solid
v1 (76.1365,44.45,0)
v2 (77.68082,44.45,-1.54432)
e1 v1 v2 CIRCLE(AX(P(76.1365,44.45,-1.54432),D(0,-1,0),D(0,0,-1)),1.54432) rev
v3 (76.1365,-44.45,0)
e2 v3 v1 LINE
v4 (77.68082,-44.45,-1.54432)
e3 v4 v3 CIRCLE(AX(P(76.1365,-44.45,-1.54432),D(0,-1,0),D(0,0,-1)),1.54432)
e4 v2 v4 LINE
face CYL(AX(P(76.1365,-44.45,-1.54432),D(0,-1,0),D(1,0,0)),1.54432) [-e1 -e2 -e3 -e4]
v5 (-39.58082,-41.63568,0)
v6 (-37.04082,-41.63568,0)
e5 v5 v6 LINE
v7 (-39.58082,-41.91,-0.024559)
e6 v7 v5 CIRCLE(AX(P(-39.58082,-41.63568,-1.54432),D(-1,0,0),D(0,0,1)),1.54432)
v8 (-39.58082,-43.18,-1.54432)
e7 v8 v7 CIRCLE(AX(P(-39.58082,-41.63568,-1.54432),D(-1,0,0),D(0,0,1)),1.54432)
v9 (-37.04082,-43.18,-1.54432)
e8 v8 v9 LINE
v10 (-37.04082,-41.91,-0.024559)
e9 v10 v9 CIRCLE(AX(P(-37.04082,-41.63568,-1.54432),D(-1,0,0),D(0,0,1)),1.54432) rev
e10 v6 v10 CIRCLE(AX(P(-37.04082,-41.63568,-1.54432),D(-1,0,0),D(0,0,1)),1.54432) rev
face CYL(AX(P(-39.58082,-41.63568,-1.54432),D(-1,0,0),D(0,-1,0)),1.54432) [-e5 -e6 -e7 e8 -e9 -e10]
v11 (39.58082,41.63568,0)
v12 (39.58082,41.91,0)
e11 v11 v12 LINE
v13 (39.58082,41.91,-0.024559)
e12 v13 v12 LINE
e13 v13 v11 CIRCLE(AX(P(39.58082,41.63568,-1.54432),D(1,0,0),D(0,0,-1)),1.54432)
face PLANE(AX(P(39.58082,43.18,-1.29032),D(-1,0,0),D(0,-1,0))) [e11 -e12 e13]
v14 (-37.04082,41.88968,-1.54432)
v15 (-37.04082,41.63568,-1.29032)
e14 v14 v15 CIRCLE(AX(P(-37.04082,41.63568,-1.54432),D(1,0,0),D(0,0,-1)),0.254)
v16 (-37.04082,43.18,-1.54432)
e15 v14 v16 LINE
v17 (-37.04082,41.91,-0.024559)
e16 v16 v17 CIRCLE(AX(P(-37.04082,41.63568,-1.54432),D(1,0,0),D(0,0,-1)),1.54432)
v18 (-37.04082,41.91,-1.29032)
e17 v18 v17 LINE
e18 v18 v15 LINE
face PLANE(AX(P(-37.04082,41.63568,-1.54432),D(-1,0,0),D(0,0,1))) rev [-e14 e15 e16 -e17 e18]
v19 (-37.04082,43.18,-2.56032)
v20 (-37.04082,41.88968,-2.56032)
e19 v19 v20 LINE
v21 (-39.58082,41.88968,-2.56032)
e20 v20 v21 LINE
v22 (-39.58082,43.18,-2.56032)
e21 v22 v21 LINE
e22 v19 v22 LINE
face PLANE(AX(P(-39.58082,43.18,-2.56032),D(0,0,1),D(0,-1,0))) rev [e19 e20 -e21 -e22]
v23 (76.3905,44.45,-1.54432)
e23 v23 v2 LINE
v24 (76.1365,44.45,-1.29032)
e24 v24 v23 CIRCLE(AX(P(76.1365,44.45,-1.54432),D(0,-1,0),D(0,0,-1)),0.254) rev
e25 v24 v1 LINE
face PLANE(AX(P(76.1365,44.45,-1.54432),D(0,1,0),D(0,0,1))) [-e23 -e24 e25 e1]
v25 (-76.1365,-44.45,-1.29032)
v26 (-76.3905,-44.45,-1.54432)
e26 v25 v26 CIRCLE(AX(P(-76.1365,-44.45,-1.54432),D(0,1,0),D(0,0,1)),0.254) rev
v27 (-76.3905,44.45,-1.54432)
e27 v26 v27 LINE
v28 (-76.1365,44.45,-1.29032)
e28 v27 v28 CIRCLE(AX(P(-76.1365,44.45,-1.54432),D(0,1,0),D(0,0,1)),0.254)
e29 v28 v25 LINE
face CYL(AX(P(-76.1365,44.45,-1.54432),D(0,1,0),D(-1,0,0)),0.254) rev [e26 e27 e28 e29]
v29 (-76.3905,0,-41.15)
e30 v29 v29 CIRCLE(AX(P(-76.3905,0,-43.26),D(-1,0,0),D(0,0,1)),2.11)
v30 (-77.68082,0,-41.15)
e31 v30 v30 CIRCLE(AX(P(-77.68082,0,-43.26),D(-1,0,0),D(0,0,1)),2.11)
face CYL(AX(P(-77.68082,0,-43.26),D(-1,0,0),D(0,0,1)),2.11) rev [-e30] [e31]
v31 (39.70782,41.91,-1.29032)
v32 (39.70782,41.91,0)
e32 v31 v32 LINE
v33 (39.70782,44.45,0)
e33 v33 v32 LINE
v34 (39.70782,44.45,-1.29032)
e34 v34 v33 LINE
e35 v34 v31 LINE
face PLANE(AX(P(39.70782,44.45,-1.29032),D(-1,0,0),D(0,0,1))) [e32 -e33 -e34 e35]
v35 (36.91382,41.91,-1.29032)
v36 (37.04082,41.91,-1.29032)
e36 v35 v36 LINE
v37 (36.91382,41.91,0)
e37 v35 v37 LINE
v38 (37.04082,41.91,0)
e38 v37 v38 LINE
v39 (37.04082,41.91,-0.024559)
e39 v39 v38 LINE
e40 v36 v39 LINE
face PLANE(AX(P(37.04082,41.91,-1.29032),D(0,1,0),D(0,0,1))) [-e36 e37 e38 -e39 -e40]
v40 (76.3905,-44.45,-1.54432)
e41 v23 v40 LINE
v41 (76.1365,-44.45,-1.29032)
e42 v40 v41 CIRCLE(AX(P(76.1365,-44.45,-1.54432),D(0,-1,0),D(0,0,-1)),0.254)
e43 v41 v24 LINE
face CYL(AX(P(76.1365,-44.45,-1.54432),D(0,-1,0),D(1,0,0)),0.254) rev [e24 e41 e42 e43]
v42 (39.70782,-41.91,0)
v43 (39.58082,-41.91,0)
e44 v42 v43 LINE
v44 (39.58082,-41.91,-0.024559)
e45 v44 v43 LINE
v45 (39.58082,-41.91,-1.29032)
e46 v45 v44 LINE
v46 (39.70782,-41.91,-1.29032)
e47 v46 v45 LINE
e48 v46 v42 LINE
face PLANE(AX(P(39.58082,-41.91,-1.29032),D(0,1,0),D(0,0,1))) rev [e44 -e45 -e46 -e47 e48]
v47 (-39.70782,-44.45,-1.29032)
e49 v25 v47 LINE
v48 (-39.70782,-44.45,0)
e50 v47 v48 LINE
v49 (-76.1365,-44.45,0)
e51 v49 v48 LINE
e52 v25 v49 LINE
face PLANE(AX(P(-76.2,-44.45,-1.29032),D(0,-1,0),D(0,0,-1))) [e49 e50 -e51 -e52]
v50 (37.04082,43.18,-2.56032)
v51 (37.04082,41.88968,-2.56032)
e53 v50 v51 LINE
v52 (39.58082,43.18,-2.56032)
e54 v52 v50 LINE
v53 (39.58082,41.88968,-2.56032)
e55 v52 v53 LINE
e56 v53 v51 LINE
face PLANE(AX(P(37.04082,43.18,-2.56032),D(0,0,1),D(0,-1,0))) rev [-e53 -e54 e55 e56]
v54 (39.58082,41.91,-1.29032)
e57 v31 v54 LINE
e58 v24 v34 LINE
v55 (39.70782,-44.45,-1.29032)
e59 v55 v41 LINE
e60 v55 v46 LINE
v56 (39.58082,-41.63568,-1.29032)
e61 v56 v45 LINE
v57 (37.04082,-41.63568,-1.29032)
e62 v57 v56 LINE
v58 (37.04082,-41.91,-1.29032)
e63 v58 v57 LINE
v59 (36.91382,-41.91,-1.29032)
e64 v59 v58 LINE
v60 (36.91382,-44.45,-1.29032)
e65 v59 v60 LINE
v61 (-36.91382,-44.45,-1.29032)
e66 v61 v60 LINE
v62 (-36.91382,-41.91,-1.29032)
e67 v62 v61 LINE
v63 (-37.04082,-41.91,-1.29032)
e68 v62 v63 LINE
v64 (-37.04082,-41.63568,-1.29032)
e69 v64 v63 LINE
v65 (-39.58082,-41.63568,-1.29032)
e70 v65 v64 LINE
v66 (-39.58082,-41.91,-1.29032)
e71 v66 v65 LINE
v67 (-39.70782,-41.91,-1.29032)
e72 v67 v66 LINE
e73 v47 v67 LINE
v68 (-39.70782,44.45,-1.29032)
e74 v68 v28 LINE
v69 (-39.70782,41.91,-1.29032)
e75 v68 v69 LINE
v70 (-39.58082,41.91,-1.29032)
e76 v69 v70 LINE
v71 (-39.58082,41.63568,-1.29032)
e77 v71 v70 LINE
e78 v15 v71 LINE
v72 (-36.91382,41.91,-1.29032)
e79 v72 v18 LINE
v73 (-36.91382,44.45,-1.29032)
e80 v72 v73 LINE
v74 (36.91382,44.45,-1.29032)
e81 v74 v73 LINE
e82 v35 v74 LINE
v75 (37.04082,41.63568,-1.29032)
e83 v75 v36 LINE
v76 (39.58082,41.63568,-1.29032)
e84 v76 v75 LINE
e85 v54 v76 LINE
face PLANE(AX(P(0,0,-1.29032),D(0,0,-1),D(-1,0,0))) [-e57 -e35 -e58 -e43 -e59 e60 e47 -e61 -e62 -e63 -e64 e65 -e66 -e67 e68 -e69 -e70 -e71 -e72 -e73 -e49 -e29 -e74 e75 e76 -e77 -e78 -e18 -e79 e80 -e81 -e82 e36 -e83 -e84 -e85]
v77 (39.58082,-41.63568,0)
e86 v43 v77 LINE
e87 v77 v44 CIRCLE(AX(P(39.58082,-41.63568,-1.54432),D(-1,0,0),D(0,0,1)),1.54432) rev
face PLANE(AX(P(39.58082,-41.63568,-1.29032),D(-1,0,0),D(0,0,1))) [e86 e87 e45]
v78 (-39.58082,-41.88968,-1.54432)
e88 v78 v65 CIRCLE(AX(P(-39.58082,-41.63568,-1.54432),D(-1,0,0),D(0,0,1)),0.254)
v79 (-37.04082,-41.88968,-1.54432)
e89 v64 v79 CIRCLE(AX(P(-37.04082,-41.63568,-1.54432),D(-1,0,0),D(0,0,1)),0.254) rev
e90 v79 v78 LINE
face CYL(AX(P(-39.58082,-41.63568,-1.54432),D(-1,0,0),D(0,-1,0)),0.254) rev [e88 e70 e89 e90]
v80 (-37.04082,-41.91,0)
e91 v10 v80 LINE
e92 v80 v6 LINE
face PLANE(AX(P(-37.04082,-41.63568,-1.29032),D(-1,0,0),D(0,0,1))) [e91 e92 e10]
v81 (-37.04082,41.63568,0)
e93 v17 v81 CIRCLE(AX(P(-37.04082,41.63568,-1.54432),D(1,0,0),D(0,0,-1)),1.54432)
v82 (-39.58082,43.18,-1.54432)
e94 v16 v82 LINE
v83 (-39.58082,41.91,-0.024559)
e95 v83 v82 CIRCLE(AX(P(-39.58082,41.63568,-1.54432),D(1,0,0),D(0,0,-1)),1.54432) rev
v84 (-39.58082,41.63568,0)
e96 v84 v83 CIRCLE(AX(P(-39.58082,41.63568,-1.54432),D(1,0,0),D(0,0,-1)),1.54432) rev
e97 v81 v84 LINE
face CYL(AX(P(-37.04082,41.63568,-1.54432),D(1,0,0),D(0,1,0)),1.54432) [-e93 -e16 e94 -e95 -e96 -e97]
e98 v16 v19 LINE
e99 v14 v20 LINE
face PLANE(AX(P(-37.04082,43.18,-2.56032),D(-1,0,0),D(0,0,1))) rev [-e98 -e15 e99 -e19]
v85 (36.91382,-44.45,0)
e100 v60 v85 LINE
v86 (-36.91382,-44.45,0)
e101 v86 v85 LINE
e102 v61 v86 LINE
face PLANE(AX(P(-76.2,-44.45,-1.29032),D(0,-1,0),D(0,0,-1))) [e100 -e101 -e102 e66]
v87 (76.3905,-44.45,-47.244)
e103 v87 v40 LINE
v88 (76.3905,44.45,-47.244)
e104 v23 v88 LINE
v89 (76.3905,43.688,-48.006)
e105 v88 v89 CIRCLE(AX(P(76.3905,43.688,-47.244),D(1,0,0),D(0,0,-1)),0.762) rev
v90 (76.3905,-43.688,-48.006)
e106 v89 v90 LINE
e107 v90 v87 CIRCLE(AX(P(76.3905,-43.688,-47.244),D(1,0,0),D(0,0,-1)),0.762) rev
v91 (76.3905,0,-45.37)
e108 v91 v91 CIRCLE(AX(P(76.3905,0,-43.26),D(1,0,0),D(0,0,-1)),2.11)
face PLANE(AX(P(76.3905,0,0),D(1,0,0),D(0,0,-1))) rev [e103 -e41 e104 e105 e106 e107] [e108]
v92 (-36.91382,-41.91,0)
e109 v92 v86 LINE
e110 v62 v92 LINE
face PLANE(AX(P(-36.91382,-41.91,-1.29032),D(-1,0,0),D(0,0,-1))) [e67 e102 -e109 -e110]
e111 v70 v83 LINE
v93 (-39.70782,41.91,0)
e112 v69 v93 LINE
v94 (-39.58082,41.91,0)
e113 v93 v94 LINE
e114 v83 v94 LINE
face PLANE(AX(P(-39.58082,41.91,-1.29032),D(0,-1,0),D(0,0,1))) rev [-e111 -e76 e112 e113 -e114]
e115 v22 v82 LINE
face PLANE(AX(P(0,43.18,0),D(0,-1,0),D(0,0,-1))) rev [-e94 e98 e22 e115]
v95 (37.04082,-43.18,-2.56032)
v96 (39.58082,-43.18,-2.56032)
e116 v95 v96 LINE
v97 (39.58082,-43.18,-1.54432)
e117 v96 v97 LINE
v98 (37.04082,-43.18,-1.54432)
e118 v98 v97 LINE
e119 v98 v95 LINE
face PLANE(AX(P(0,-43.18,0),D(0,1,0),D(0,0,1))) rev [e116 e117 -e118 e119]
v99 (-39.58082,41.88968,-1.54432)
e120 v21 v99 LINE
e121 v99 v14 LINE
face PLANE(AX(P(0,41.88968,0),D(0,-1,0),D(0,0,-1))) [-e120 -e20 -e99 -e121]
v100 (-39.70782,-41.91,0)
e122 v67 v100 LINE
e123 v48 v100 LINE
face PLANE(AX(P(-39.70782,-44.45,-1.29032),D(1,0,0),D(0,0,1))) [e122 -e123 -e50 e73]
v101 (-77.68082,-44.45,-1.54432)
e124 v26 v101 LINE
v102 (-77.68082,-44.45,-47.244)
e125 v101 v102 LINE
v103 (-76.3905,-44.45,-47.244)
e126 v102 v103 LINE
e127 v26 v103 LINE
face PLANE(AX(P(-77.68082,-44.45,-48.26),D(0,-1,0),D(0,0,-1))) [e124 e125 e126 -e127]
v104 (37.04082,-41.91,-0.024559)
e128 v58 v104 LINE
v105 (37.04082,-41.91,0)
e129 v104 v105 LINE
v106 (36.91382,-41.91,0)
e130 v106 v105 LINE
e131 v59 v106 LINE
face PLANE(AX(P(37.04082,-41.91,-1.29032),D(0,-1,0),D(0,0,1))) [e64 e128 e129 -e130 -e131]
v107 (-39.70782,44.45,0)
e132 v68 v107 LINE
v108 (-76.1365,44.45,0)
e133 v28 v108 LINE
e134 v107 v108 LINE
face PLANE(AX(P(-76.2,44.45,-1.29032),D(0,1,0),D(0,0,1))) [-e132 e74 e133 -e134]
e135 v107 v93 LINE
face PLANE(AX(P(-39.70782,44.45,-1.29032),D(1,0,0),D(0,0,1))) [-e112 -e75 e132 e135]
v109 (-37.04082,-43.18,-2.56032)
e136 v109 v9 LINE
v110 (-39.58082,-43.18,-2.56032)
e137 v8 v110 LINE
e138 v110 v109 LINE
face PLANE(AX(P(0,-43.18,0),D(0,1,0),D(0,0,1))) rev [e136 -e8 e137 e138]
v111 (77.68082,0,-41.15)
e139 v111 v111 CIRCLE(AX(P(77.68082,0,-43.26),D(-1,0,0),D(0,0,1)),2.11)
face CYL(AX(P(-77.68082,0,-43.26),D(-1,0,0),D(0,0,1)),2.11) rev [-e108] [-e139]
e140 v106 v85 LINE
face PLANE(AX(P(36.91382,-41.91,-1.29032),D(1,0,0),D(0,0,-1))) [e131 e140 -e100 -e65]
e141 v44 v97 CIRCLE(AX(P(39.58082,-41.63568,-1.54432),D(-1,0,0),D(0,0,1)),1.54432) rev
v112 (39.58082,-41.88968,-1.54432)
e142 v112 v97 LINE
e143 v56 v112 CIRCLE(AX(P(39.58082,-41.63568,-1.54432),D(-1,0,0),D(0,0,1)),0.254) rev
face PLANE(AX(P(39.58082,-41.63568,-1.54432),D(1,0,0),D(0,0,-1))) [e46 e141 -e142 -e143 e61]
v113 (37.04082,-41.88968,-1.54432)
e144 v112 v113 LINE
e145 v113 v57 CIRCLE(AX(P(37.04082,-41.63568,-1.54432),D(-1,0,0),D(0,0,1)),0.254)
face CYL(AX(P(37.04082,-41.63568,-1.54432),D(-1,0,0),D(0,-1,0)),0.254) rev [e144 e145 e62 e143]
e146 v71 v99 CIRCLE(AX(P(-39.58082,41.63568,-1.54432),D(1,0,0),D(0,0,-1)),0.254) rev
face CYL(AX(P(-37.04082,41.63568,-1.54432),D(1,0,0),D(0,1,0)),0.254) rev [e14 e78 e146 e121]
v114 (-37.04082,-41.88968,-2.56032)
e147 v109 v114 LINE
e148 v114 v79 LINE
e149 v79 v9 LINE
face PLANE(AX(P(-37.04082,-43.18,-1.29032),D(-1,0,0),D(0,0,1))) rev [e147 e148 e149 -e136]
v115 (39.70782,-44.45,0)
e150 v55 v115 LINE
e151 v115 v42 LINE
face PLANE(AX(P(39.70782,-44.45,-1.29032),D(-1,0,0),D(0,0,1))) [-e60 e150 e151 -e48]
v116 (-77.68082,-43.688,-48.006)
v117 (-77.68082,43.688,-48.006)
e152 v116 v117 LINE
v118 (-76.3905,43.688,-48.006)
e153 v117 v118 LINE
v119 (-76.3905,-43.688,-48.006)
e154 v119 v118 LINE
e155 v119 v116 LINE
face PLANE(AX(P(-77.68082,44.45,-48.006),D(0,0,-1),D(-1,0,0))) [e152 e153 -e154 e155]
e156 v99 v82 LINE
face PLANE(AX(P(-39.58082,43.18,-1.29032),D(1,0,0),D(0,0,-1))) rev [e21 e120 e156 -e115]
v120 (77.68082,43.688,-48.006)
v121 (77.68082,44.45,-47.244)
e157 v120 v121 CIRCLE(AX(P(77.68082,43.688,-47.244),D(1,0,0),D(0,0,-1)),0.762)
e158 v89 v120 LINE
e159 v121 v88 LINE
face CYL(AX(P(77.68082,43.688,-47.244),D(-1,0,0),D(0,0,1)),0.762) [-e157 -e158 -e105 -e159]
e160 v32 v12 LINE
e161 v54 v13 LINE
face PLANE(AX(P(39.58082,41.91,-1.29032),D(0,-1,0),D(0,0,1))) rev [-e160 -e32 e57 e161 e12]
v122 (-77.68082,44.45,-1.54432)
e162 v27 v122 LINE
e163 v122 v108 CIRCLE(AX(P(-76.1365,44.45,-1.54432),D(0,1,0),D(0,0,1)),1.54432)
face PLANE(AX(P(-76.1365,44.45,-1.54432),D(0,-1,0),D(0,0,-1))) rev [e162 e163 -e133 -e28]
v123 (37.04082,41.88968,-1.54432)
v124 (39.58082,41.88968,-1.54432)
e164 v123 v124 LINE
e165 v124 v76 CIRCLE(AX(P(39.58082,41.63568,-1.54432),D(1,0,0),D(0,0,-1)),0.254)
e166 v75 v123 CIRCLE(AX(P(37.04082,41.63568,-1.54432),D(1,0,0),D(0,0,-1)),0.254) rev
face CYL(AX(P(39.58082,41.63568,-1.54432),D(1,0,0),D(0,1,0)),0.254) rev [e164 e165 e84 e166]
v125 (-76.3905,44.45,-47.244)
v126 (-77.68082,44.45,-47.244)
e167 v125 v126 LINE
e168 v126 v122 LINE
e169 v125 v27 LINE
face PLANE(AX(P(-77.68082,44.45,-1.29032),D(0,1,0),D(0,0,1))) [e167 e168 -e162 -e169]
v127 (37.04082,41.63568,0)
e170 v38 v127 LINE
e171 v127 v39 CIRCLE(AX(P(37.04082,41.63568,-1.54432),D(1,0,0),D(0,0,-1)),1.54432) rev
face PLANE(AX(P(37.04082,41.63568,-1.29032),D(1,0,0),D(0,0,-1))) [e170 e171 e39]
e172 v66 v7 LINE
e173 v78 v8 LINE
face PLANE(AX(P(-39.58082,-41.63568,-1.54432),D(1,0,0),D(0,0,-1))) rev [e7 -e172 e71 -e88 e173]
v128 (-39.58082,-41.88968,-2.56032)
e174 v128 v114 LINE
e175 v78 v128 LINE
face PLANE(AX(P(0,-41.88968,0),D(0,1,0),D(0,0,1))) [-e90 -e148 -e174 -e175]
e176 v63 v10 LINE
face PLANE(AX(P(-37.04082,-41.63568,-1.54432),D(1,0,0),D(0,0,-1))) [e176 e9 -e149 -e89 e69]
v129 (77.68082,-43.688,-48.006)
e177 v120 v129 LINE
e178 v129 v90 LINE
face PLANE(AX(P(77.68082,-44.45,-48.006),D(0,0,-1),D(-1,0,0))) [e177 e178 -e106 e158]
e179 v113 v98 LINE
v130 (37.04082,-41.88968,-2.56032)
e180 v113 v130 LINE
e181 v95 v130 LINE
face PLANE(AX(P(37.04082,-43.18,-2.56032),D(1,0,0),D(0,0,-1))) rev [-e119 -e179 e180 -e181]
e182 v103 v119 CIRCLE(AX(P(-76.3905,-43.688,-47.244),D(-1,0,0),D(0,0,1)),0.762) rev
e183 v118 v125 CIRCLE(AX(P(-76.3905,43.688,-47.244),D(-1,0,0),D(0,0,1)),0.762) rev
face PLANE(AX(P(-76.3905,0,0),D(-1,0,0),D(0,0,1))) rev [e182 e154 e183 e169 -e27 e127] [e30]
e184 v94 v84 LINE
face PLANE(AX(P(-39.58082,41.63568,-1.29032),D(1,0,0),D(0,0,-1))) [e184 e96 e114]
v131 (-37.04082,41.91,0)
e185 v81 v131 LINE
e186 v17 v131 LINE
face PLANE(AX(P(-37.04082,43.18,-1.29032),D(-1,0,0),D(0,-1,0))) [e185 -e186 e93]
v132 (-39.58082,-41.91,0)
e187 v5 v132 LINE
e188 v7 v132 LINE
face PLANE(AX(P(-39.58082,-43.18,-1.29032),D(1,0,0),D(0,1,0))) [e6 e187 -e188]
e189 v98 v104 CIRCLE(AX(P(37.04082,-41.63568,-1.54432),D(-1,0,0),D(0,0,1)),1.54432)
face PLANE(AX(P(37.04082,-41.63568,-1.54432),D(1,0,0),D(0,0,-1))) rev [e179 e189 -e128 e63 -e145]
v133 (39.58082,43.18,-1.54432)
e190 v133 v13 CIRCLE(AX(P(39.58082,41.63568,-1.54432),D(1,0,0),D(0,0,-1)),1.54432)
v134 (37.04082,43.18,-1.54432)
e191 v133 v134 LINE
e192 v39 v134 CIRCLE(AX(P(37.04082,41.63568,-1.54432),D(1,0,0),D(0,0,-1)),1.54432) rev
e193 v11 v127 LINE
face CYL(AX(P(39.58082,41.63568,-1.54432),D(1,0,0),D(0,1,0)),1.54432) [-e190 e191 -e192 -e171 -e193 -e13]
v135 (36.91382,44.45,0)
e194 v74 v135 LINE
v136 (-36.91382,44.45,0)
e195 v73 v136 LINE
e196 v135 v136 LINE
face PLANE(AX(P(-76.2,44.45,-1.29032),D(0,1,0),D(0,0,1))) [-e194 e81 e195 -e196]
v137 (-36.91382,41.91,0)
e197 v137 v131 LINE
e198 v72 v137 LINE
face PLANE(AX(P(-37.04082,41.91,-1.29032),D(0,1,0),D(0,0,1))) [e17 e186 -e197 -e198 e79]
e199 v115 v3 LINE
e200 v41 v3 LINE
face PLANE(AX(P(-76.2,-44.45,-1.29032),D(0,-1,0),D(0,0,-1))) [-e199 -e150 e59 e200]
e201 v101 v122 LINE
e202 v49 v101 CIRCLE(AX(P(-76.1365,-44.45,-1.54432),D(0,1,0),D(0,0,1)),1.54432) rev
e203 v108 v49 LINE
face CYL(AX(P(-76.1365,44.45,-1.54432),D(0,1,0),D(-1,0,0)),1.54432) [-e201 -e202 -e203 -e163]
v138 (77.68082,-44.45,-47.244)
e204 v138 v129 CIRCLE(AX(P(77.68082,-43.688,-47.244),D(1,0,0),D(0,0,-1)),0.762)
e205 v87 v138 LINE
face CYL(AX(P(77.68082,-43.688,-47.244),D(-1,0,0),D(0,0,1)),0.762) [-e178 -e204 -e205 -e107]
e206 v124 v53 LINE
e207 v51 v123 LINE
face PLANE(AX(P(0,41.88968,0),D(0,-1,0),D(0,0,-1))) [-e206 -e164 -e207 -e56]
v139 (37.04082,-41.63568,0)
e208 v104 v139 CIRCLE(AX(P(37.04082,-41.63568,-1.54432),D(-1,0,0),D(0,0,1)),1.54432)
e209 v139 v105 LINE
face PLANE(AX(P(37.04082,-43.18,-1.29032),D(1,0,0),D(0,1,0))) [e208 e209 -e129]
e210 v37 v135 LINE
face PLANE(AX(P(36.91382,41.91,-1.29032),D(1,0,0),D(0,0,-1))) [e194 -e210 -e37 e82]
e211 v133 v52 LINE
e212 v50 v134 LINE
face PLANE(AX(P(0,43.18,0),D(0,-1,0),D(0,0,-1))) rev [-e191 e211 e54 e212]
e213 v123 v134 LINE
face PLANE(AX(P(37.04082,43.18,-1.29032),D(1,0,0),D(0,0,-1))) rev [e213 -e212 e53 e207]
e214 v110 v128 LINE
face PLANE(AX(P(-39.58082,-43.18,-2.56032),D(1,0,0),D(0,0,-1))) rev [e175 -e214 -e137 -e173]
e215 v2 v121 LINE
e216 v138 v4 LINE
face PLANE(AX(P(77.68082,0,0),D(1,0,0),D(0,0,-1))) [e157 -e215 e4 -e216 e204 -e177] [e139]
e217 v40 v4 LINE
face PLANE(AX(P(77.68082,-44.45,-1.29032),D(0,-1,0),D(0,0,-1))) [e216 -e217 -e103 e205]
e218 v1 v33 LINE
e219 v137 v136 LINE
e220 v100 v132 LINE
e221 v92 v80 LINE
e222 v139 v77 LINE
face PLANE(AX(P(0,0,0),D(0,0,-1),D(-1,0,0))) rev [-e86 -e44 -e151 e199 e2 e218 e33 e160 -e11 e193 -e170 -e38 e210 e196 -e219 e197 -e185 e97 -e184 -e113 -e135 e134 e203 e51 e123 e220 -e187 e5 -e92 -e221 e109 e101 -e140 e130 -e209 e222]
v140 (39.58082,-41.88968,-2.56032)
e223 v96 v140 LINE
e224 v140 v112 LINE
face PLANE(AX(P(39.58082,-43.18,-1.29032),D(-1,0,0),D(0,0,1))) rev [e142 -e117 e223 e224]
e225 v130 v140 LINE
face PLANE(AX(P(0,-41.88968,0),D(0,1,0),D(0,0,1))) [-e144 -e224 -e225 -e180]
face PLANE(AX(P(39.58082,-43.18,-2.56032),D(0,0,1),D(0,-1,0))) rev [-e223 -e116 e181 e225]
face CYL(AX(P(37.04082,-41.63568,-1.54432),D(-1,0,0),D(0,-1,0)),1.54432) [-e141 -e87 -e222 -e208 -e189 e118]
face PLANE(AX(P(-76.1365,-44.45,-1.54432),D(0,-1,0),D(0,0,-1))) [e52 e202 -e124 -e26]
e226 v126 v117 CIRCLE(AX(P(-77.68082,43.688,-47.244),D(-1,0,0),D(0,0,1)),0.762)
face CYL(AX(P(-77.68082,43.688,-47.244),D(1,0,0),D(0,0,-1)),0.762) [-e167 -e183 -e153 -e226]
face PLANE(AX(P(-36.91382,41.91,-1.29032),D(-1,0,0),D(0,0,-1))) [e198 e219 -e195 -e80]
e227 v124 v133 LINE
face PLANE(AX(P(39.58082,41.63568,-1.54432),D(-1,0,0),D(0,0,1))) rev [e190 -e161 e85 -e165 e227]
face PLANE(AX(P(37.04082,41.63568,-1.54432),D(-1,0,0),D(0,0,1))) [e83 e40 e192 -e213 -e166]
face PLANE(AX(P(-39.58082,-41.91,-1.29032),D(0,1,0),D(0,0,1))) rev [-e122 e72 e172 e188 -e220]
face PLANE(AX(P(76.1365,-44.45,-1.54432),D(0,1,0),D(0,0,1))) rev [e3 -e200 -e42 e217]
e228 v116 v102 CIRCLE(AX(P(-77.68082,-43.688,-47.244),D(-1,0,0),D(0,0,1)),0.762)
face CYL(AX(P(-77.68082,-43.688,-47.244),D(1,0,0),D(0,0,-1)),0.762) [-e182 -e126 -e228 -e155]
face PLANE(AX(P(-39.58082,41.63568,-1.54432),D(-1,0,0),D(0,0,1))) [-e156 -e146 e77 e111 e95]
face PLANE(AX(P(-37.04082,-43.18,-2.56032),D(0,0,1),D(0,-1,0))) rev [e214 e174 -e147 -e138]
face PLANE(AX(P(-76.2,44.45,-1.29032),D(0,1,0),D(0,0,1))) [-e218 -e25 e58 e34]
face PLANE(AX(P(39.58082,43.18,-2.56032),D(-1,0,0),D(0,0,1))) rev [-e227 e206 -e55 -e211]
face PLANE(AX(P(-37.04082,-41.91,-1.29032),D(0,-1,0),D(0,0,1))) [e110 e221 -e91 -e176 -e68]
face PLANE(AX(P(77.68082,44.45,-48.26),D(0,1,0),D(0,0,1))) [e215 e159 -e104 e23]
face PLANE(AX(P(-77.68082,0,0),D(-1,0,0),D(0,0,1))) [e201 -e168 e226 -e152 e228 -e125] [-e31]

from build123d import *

# Parameters (mm, degrees)
SKETCH1_W                                    = 152.4
SKETCH1_H                                    = 88.9
BASE_FLANGE1_DEPTH                           = 1.29032
EDGE_FLANGE1_STRIP_W                         = 5.85978
EDGE_FLANGE1_STRIP_H                         = 1.29032
EDGE_FLANGE1_STRIP_CUT_DEPTH                 = 88.9
EDGE_FLANGE1_STRIP_2_W                       = 5.85978
EDGE_FLANGE1_STRIP_2_H                       = 1.29032
EDGE_FLANGE1_STRIP_CUT_2_DEPTH               = 88.9
EDGE_FLANGE1_DEPTH                           = 88.9
EDGE_FLANGE1_BEND_DEPTH                      = 88.9
F_4_22MM_HOLE_FOR_M3_CLINCH_NUT_D            = 4.22
BREAK_CORNER1_START                          = -77.68082
BREAK_CORNER1_DEPTH                          = 155.36164
CUT_THICKEN1_START                           = 41.91
CUT_THICKEN1_OUTLINE_W                       = 0.127
CUT_THICKEN1_OUTLINE_H                       = 1.29032
CUT_THICKEN1_DEPTH                           = 2.54
CUT_THICKEN2_START                           = 41.91
CUT_THICKEN2_OUTLINE_W                       = 0.127
CUT_THICKEN2_OUTLINE_H                       = 1.29032
CUT_THICKEN2_DEPTH                           = 2.54
MIRROR7_START                                = 41.91
MIRROR7_COPY_1_SKETCH_W                      = 0.127
MIRROR7_COPY_1_SKETCH_H                      = 1.29032
MIRROR7_COPY_1_DEPTH                         = 2.54
MIRROR7_COPY_2_SKETCH_W                      = 0.127
MIRROR7_COPY_2_SKETCH_H                      = 1.29032
MIRROR7_COPY_2_DEPTH                         = 2.54
MOVE_FACE1_BY                                = 1.27
MOVE_FACE1_2_BY                              = 1.27
MOVE_FACE1_3_BY                              = 1.27
MOVE_FACE1_4_BY                              = 1.27
EDGE_FLANGE2_STRIP_W                         = 5.66928
EDGE_FLANGE2_STRIP_H                         = 1.29032
EDGE_FLANGE2_STRIP_CUT_DEPTH                 = 2.54
EDGE_FLANGE2_STRIP_2_W                       = 5.66928
EDGE_FLANGE2_STRIP_2_H                       = 1.29032
EDGE_FLANGE2_STRIP_CUT_2_DEPTH               = 2.54
EDGE_FLANGE2_STRIP_3_W                       = 5.66928
EDGE_FLANGE2_STRIP_3_H                       = 1.29032
EDGE_FLANGE2_STRIP_CUT_3_DEPTH               = 2.54
EDGE_FLANGE2_STRIP_4_W                       = 5.66928
EDGE_FLANGE2_STRIP_4_H                       = 1.29032
EDGE_FLANGE2_STRIP_CUT_4_DEPTH               = 2.54
EDGE_FLANGE2_DEPTH                           = 2.54
EDGE_FLANGE2_BEND_DEPTH                      = 2.54
EDGE_FLANGE2_BEND_2_DEPTH                    = 2.54
EDGE_FLANGE2_BEND_3_DEPTH                    = 2.54
CHANGE_START                                 = -77.68082
CHANGE_NOTE_FOR_REVH_TO_ADD_010_CLEARA_DEPTH = 155.36164


# Read off the part's stored shape, not the designer's step: Break-Corner1, Cut-Thicken1, Cut-Thicken2, change note for revH to add .010" clearance
# Sheet-metal steps are written as plain solids
with BuildPart() as part:
    # Sketch1 → Base-Flange1 (new body)
    with BuildSketch(Plane.XY):
        Rectangle(SKETCH1_W, SKETCH1_H)
    extrude(amount=-BASE_FLANGE1_DEPTH)

    # Edge-Flange1 strip (across the edge) → Edge-Flange1 strip cut (cut)
    with BuildSketch(Plane(origin=(-76.3905, -44.45, -1.29032), x_dir=(1, 0, 0), z_dir=(0, 1, 0))):
        with Locations((-2.67589, -0.64516)):
            Rectangle(EDGE_FLANGE1_STRIP_W, EDGE_FLANGE1_STRIP_H)
    extrude(amount=EDGE_FLANGE1_STRIP_CUT_DEPTH, mode=Mode.SUBTRACT)

    # Edge-Flange1 strip 2 (across the edge) → Edge-Flange1 strip cut 2 (cut)
    with BuildSketch(Plane(origin=(76.3905, 44.45, -1.29032), x_dir=(-1, 0, 0), z_dir=(0, -1, 0))):
        with Locations((-2.67589, -0.64516)):
            Rectangle(EDGE_FLANGE1_STRIP_2_W, EDGE_FLANGE1_STRIP_2_H)
    extrude(amount=EDGE_FLANGE1_STRIP_CUT_2_DEPTH, mode=Mode.SUBTRACT)

    # Edge-Flange1 section (across the edge) → Edge-Flange1 (add)
    with BuildSketch(Plane(origin=(-76.3905, -44.45, -1.29032), x_dir=(1, 0, 0), z_dir=(0, 1, 0))):
        with BuildLine():
            Line((-1.29032, 0.254), (-1.29032, 46.96968))
            Line((-1.29032, 46.96968), (0, 46.96968))
            Line((0, 46.96968), (0, 0.254))
            ThreePointArc((0, 0.254), (0.074394878, 0.074394878), (0.254, 0))
            Line((0.254, 0), (0.254, -1.29032))
            ThreePointArc((0.254, -1.29032), (-0.837999144, -0.837999144), (-1.29032, 0.254))
        make_face()
    extrude(amount=EDGE_FLANGE1_DEPTH)

    # Edge-Flange1 section 2 (across the edge) → Edge-Flange1 bend (add)
    with BuildSketch(Plane(origin=(76.3905, 44.45, -1.29032), x_dir=(-1, 0, 0), z_dir=(0, -1, 0))):
        with BuildLine():
            Line((-1.29032, 0.254), (-1.29032, 46.96968))
            Line((-1.29032, 46.96968), (0, 46.96968))
            Line((0, 46.96968), (0, 0.254))
            ThreePointArc((0, 0.254), (0.074394878, 0.074394878), (0.254, 0))
            Line((0.254, 0), (0.254, -1.29032))
            ThreePointArc((0.254, -1.29032), (-0.837999144, -0.837999144), (-1.29032, 0.254))
        make_face()
    extrude(amount=EDGE_FLANGE1_BEND_DEPTH)

    # Ø4.22mm hole for M3 Clinch nut (through all)
    with Locations(Plane.ZY.offset(77.68082)):
        with Locations((-43.26, 0)):
            f_4_22mm_hole_for_m3_clinch_nut = Hole(F_4_22MM_HOLE_FOR_M3_CLINCH_NUT_D / 2)

    # Mirror1: Ø4.22mm hole for M3 Clinch nut across plane
    add(f_4_22mm_hole_for_m3_clinch_nut.mirror(Plane(origin=(0, 0, 0), x_dir=(0, 0, 1), z_dir=(1, 0, 0))), mode=Mode.SUBTRACT)

    # Break-Corner1 outline → Break-Corner1 (cut)
    with BuildSketch(Plane.YZ.offset(BREAK_CORNER1_START)):
        with BuildLine():
            Line((44.45, -48.26), (44.45, -47.498))
            ThreePointArc((44.45, -47.498), (44.226815367, -48.036815367), (43.688, -48.26))
            Line((43.688, -48.26), (44.45, -48.26))
        make_face()
        with BuildLine():
            Line((-44.45, -48.26), (-43.688, -48.26))
            ThreePointArc((-43.688, -48.26), (-44.226815367, -48.036815367), (-44.45, -47.498))
            Line((-44.45, -47.498), (-44.45, -48.26))
        make_face()
    extrude(amount=BREAK_CORNER1_DEPTH, mode=Mode.SUBTRACT)

    # Cut-Thicken1 outline → Cut-Thicken1 (cut)
    with BuildSketch(Plane(origin=(0, 0, 0), x_dir=(1, 0, 0), z_dir=(0, 1, 0)).offset(CUT_THICKEN1_START)):
        with Locations((36.97732, 0.64516)):
            Rectangle(CUT_THICKEN1_OUTLINE_W, CUT_THICKEN1_OUTLINE_H)
    cut_thicken1 = extrude(amount=CUT_THICKEN1_DEPTH, mode=Mode.SUBTRACT)

    # Cut-Thicken2 outline → Cut-Thicken2 (cut)
    with BuildSketch(Plane(origin=(0, 0, 0), x_dir=(1, 0, 0), z_dir=(0, 1, 0)).offset(CUT_THICKEN2_START)):
        with Locations((39.64432, 0.64516)):
            Rectangle(CUT_THICKEN2_OUTLINE_W, CUT_THICKEN2_OUTLINE_H)
    cut_thicken2 = extrude(amount=CUT_THICKEN2_DEPTH, mode=Mode.SUBTRACT)

    # Mirror6: Cut-Thicken1, Cut-Thicken2 across plane
    add(cut_thicken1.mirror(Plane(origin=(0, 0, 0), x_dir=(0, 0, 1), z_dir=(1, 0, 0))), mode=Mode.SUBTRACT)
    add(cut_thicken2.mirror(Plane(origin=(0, 0, 0), x_dir=(0, 0, 1), z_dir=(1, 0, 0))), mode=Mode.SUBTRACT)

    # Mirror7: Cut-Thicken1, Cut-Thicken2 across plane
    add(cut_thicken1.mirror(Plane.ZX), mode=Mode.SUBTRACT)
    add(cut_thicken2.mirror(Plane.ZX), mode=Mode.SUBTRACT)

    # Mirror7 copy 1 sketch → Mirror7 copy 1 (cut)
    with BuildSketch(Plane(origin=(0, 0, 0), x_dir=(-1, 0, 0), z_dir=(0, -1, 0)).offset(MIRROR7_START)):
        with Locations((36.97732, 0.64516)):
            Rectangle(MIRROR7_COPY_1_SKETCH_W, MIRROR7_COPY_1_SKETCH_H)
    extrude(amount=MIRROR7_COPY_1_DEPTH, mode=Mode.SUBTRACT)

    # Mirror7 copy 2 sketch → Mirror7 copy 2 (cut)
    with BuildSketch(Plane(origin=(0, 0, 0), x_dir=(-1, 0, 0), z_dir=(0, -1, 0)).offset(MIRROR7_START)):
        with Locations((39.64432, 0.64516)):
            Rectangle(MIRROR7_COPY_2_SKETCH_W, MIRROR7_COPY_2_SKETCH_H)
    extrude(amount=MIRROR7_COPY_2_DEPTH, mode=Mode.SUBTRACT)

    # Move Face1: a face moved inward by 1.27
    extrude(part.faces().sort_by_distance((-38.31082, -44.45, -0.64516))[0], amount=MOVE_FACE1_BY, dir=(0, 1, 0), mode=Mode.SUBTRACT)

    # Move Face1 2: a face moved inward by 1.27
    extrude(part.faces().sort_by_distance((38.31082, -44.45, -0.64516))[0], amount=MOVE_FACE1_2_BY, dir=(0, 1, 0), mode=Mode.SUBTRACT)

    # Move Face1 3: a face moved inward by 1.27
    extrude(part.faces().sort_by_distance((-38.31082, 44.45, -0.64516))[0], amount=MOVE_FACE1_3_BY, dir=(0, -1, 0), mode=Mode.SUBTRACT)

    # Move Face1 4: a face moved inward by 1.27
    extrude(part.faces().sort_by_distance((38.31082, 44.45, -0.64516))[0], amount=MOVE_FACE1_4_BY, dir=(0, -1, 0), mode=Mode.SUBTRACT)

    # Edge-Flange2 strip (across the edge) → Edge-Flange2 strip cut (cut)
    with BuildSketch(Plane(origin=(37.04082, 43.18, -1.29032), x_dir=(0, -1, 0), z_dir=(1, 0, 0))):
        with Locations((-1.29032, -0.64516)):
            Rectangle(EDGE_FLANGE2_STRIP_W, EDGE_FLANGE2_STRIP_H)
    extrude(amount=EDGE_FLANGE2_STRIP_CUT_DEPTH, mode=Mode.SUBTRACT)

    # Edge-Flange2 strip 2 (across the edge) → Edge-Flange2 strip cut 2 (cut)
    with BuildSketch(Plane(origin=(-39.58082, 43.18, -1.29032), x_dir=(0, -1, 0), z_dir=(1, 0, 0))):
        with Locations((-1.29032, -0.64516)):
            Rectangle(EDGE_FLANGE2_STRIP_2_W, EDGE_FLANGE2_STRIP_2_H)
    extrude(amount=EDGE_FLANGE2_STRIP_CUT_2_DEPTH, mode=Mode.SUBTRACT)

    # Edge-Flange2 strip 3 (across the edge) → Edge-Flange2 strip cut 3 (cut)
    with BuildSketch(Plane(origin=(39.58082, -43.18, -1.29032), x_dir=(0, 1, 0), z_dir=(-1, 0, 0))):
        with Locations((-1.29032, -0.64516)):
            Rectangle(EDGE_FLANGE2_STRIP_3_W, EDGE_FLANGE2_STRIP_3_H)
    extrude(amount=EDGE_FLANGE2_STRIP_CUT_3_DEPTH, mode=Mode.SUBTRACT)

    # Edge-Flange2 strip 4 (across the edge) → Edge-Flange2 strip cut 4 (cut)
    with BuildSketch(Plane(origin=(-37.04082, -43.18, -1.29032), x_dir=(0, 1, 0), z_dir=(-1, 0, 0))):
        with Locations((-1.29032, -0.64516)):
            Rectangle(EDGE_FLANGE2_STRIP_4_W, EDGE_FLANGE2_STRIP_4_H)
    extrude(amount=EDGE_FLANGE2_STRIP_CUT_4_DEPTH, mode=Mode.SUBTRACT)

    # Edge-Flange2 section (across the edge) → Edge-Flange2 (add)
    with BuildSketch(Plane(origin=(37.04082, 43.18, -1.29032), x_dir=(0, -1, 0), z_dir=(1, 0, 0))):
        with BuildLine():
            Line((0, 0.254), (0, 1.27))
            Line((0, 1.27), (1.29032, 1.27))
            Line((1.29032, 1.27), (1.29032, 0.254))
            ThreePointArc((1.29032, 0.254), (1.364714878, 0.074394878), (1.54432, 0))
            Line((1.54432, 0), (1.54432, -1.29032))
            ThreePointArc((1.54432, -1.29032), (0.452320856, -0.837999144), (0, 0.254))
        make_face()
    extrude(amount=EDGE_FLANGE2_DEPTH)

    # Edge-Flange2 section 2 (across the edge) → Edge-Flange2 bend (add)
    with BuildSketch(Plane(origin=(-39.58082, 43.18, -1.29032), x_dir=(0, -1, 0), z_dir=(1, 0, 0))):
        with BuildLine():
            Line((0, 0.254), (0, 1.27))
            Line((0, 1.27), (1.29032, 1.27))
            Line((1.29032, 1.27), (1.29032, 0.254))
            ThreePointArc((1.29032, 0.254), (1.364714878, 0.074394878), (1.54432, 0))
            Line((1.54432, 0), (1.54432, -1.29032))
            ThreePointArc((1.54432, -1.29032), (0.452320856, -0.837999144), (0, 0.254))
        make_face()
    extrude(amount=EDGE_FLANGE2_BEND_DEPTH)

    # Edge-Flange2 section 3 (across the edge) → Edge-Flange2 bend 2 (add)
    with BuildSketch(Plane(origin=(39.58082, -43.18, -1.29032), x_dir=(0, 1, 0), z_dir=(-1, 0, 0))):
        with BuildLine():
            Line((0, 0.254), (0, 1.27))
            Line((0, 1.27), (1.29032, 1.27))
            Line((1.29032, 1.27), (1.29032, 0.254))
            ThreePointArc((1.29032, 0.254), (1.364714878, 0.074394878), (1.54432, 0))
            Line((1.54432, 0), (1.54432, -1.29032))
            ThreePointArc((1.54432, -1.29032), (0.452320856, -0.837999144), (0, 0.254))
        make_face()
    extrude(amount=EDGE_FLANGE2_BEND_2_DEPTH)

    # Edge-Flange2 section 4 (across the edge) → Edge-Flange2 bend 3 (add)
    with BuildSketch(Plane(origin=(-37.04082, -43.18, -1.29032), x_dir=(0, 1, 0), z_dir=(-1, 0, 0))):
        with BuildLine():
            Line((0, 0.254), (0, 1.27))
            Line((0, 1.27), (1.29032, 1.27))
            Line((1.29032, 1.27), (1.29032, 0.254))
            ThreePointArc((1.29032, 0.254), (1.364714878, 0.074394878), (1.54432, 0))
            Line((1.54432, 0), (1.54432, -1.29032))
            ThreePointArc((1.54432, -1.29032), (0.452320856, -0.837999144), (0, 0.254))
        make_face()
    extrude(amount=EDGE_FLANGE2_BEND_3_DEPTH)

    # change note for revH to add .010_ cl 2 → change note for revH to add .010" clearance (cut)
    with BuildSketch(Plane.YZ.offset(CHANGE_START)):
        with BuildLine():
            Line((43.688, -48.006), (-43.688, -48.006))
            ThreePointArc((-43.688, -48.006), (-44.226815367, -47.782815367), (-44.45, -47.244))
            Line((-44.45, -47.244), (-44.45, -47.498))
            ThreePointArc((-44.45, -47.498), (-44.226815367, -48.036815367), (-43.688, -48.26))
            Line((-43.688, -48.26), (43.688, -48.26))
            ThreePointArc((43.688, -48.26), (44.226815367, -48.036815367), (44.45, -47.498))
            Line((44.45, -47.498), (44.45, -47.244))
            ThreePointArc((44.45, -47.244), (44.226815367, -47.782815367), (43.688, -48.006))
        make_face()
    extrude(amount=CHANGE_NOTE_FOR_REVH_TO_ADD_010_CLEARA_DEPTH, mode=Mode.SUBTRACT)


solid = part.part
